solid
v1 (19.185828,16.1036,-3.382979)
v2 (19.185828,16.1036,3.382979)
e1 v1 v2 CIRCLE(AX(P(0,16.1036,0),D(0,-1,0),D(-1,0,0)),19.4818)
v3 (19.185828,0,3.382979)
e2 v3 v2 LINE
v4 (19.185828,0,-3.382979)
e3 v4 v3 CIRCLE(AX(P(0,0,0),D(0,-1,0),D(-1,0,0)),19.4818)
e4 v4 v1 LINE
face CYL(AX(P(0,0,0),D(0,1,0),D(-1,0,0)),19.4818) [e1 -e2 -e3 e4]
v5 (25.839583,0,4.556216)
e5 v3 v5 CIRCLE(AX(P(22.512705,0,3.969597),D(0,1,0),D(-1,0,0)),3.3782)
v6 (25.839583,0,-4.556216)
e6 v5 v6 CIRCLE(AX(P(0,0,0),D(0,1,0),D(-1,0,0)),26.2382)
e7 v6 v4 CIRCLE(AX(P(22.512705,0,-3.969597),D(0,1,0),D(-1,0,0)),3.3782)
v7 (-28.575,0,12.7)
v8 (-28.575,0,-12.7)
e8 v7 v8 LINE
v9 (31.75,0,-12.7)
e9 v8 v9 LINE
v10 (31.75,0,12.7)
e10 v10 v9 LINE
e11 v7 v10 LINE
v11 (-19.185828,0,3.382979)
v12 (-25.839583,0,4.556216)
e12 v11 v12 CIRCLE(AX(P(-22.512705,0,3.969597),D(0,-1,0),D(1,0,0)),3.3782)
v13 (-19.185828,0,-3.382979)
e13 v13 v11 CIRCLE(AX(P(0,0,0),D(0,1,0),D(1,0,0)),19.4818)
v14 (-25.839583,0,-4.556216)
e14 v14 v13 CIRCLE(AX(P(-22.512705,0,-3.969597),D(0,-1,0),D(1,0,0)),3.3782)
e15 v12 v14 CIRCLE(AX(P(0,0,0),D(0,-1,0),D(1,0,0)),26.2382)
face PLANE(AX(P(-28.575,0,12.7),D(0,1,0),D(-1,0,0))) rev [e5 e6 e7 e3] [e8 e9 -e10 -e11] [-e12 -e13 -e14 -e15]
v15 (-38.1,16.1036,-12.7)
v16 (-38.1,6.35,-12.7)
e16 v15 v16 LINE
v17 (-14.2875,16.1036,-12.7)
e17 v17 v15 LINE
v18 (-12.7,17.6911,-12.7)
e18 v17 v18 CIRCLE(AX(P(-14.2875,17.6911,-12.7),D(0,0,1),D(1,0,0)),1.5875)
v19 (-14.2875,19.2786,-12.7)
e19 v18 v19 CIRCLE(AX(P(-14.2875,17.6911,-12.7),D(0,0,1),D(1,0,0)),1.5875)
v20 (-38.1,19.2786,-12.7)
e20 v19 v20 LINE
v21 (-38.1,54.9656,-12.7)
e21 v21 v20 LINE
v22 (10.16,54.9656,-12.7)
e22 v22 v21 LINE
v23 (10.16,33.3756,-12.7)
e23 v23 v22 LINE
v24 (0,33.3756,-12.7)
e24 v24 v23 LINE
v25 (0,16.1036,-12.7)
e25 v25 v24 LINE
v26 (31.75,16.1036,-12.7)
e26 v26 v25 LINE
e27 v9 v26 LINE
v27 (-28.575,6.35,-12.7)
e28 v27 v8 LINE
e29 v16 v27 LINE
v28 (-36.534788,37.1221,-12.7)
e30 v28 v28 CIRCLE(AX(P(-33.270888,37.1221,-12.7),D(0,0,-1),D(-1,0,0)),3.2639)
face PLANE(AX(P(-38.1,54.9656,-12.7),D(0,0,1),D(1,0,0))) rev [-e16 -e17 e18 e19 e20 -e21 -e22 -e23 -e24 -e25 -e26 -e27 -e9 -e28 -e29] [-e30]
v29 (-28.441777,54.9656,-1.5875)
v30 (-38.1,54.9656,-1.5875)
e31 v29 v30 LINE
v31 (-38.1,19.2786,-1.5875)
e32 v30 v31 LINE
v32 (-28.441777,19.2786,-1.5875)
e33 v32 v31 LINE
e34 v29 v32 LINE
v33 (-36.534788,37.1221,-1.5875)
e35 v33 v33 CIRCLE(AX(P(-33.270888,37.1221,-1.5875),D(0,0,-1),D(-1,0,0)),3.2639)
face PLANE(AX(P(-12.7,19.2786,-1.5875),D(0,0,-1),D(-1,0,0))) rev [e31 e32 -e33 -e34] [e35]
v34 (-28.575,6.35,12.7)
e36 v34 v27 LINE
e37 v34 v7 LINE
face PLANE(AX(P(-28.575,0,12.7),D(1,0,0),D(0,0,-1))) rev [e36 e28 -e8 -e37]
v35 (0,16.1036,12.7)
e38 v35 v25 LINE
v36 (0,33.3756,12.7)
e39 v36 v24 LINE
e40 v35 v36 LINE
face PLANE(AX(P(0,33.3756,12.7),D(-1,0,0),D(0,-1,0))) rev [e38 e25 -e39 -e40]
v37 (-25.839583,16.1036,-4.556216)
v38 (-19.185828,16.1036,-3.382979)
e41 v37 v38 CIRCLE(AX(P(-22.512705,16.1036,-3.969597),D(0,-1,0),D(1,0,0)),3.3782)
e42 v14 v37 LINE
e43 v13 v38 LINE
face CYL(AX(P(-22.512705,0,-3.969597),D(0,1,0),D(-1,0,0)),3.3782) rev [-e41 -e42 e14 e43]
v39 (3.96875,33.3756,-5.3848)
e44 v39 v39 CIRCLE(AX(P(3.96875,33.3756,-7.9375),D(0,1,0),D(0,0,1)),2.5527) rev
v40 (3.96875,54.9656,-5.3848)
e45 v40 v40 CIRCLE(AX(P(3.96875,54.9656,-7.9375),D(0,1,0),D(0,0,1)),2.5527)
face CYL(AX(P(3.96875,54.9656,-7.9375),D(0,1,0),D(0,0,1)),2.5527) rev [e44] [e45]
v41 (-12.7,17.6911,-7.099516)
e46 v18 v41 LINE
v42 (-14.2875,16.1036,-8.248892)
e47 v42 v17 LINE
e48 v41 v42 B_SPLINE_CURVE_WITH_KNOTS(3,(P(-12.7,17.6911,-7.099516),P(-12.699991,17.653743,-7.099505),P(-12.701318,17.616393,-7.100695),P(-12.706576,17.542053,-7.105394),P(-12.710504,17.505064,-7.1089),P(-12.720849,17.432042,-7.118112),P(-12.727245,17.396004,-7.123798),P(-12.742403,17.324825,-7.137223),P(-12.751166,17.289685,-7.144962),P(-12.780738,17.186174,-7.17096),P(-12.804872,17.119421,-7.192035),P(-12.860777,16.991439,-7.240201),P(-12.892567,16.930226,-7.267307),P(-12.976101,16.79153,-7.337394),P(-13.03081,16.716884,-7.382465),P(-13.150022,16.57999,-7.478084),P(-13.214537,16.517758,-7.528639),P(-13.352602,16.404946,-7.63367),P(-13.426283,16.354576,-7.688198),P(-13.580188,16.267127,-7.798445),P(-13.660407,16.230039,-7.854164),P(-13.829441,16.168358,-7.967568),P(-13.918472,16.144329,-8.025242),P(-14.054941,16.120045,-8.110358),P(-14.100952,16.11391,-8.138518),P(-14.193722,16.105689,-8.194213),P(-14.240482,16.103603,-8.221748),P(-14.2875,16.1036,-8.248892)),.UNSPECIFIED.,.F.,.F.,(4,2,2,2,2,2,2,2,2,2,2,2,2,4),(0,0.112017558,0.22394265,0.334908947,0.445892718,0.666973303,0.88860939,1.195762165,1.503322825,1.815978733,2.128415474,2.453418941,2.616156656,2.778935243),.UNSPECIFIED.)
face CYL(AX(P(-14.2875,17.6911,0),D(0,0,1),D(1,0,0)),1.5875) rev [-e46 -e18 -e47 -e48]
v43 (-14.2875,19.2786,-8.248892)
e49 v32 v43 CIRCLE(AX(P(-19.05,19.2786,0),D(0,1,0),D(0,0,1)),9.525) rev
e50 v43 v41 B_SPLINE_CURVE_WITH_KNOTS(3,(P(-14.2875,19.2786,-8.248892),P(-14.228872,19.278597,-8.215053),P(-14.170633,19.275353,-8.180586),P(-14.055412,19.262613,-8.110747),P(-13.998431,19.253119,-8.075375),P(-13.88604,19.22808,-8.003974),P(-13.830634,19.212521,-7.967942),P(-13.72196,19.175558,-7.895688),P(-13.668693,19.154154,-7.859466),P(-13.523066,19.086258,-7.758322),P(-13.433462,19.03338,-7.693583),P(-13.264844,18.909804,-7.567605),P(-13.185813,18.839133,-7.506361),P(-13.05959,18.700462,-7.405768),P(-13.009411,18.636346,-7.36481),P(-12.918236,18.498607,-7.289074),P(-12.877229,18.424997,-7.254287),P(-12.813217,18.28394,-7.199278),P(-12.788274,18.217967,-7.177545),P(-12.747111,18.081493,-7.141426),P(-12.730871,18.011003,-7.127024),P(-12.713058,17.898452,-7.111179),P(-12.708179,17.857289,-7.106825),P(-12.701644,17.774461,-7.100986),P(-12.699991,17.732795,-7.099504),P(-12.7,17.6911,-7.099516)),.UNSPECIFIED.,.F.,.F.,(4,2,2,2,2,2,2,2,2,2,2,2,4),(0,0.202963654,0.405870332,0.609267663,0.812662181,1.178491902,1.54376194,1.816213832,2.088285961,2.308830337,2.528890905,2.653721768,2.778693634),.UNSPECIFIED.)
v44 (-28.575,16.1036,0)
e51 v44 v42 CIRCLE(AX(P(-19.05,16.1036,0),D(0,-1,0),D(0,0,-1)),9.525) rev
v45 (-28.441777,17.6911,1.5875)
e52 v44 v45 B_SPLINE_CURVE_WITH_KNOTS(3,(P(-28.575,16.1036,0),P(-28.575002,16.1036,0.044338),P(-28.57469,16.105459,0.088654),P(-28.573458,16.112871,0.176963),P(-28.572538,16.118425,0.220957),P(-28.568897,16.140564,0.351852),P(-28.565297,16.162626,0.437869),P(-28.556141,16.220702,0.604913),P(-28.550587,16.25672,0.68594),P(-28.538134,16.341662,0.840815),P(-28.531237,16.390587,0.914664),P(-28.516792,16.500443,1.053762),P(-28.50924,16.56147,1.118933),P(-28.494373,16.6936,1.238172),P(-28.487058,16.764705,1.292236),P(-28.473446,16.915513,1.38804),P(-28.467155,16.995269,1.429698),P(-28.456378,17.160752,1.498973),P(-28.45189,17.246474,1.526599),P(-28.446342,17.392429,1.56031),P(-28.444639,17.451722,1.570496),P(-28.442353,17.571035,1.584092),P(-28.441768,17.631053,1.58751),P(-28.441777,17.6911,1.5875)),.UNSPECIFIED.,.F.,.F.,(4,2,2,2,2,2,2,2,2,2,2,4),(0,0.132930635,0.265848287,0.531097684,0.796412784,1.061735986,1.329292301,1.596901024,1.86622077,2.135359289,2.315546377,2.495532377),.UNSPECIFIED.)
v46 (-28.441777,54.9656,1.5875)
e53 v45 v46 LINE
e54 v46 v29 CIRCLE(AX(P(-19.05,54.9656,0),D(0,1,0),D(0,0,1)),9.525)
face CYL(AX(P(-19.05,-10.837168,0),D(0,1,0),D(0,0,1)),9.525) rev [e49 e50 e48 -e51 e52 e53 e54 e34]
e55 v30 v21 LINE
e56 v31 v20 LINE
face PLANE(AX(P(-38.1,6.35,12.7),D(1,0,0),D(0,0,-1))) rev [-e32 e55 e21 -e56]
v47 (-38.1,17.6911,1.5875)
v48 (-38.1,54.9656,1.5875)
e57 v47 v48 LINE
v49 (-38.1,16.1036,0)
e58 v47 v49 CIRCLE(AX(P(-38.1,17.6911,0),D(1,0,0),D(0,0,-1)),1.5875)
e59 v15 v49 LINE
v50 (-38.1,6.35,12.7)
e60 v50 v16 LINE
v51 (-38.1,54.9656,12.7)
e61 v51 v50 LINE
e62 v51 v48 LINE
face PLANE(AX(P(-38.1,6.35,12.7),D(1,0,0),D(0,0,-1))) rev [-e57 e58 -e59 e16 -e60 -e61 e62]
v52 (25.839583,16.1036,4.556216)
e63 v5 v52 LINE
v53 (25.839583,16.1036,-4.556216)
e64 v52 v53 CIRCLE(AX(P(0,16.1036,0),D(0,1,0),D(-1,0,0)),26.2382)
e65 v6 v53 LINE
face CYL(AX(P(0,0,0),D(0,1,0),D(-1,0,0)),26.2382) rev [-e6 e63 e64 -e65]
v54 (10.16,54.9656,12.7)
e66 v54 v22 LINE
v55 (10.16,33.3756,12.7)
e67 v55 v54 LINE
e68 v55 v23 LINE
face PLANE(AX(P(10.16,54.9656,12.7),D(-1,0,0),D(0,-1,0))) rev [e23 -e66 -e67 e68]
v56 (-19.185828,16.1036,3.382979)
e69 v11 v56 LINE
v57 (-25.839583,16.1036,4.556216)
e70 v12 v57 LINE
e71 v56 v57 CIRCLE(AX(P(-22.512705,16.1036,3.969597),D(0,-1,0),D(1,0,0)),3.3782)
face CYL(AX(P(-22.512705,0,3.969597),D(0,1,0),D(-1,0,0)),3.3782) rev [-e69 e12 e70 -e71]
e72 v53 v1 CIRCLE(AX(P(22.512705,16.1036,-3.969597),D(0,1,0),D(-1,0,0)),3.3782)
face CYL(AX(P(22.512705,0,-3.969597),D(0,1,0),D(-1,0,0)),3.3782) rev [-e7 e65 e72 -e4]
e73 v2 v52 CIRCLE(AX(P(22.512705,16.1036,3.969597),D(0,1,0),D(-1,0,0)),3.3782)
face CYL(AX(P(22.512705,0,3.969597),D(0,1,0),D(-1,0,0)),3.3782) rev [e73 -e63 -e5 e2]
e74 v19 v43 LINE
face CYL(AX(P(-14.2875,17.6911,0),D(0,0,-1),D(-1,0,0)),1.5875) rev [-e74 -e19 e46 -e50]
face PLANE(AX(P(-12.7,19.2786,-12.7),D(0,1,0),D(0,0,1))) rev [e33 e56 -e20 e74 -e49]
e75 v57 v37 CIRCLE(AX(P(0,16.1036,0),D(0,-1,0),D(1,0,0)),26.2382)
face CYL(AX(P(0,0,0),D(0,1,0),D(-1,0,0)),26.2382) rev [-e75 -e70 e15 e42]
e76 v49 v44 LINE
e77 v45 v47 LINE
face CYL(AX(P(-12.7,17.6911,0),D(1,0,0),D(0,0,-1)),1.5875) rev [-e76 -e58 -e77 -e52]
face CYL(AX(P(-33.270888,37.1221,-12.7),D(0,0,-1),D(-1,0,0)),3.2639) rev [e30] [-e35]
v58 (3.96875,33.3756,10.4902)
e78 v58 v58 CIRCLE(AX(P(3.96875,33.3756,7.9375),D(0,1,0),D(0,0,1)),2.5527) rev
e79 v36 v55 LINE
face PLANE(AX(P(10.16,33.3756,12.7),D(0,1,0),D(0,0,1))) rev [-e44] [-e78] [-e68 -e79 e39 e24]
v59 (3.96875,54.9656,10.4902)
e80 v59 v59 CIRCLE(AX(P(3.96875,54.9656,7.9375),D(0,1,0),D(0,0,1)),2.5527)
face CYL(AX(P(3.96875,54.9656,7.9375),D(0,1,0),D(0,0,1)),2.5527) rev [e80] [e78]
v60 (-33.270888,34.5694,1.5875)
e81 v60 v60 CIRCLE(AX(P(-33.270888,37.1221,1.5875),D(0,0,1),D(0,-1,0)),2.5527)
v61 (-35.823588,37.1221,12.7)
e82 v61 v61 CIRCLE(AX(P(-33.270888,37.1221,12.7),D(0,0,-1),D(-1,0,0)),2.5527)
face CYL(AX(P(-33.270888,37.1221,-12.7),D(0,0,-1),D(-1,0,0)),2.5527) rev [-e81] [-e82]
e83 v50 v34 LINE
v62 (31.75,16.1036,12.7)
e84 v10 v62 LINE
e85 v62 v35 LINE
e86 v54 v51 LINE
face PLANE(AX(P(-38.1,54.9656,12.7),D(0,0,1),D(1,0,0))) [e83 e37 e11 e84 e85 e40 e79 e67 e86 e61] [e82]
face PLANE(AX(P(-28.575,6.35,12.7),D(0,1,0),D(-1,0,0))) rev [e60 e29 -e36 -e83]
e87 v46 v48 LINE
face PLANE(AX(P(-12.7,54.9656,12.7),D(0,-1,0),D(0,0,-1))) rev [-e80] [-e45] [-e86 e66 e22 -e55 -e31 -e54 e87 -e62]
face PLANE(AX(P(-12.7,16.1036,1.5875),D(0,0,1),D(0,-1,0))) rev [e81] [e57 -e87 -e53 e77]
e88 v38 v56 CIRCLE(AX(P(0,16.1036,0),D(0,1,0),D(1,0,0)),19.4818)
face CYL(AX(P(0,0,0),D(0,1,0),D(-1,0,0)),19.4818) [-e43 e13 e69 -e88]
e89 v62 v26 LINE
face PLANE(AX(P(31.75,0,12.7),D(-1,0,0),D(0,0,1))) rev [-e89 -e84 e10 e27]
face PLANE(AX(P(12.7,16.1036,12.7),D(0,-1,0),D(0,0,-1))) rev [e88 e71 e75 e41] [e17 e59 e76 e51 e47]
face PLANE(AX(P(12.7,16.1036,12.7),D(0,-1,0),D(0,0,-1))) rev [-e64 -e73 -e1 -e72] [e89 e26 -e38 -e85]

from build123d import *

# Parameters (mm, degrees)
EXTRUDE1_DEPTH              = 12.7
ARC_MOUNTING_SLOT_I_DEPTH   = 56.885195213
CLAMPING_SCREW_HOLES_D      = 5.1054
CLAMPING_SCREW_HOLES_DEPTH  = 21.59
CLAMPING_SCREW_HOLES_TIP    = 1.533816902
SKETCH7_R                   = 9.525
CUT_EXTRUDE1_DEPTH          = 38.862
CUT_EXTRUDE2_DEPTH          = 25.4
ADVANCEDHOLE1_START         = -12.7
ADVANCEDHOLE1_OUTLINE_R     = 2.5527
ADVANCEDHOLE1_DEPTH         = 25.4
ADVANCEDHOLE1_2_OUTLINE_R   = 3.2639
ADVANCEDHOLE1_2_OUTLINE_R_2 = 2.5527
ADVANCEDHOLE1_2_DEPTH       = 11.1125
FILLET1_R                   = 1.5875


# Read off the part's stored shape, not the designer's step: AdvancedHole1
with BuildPart() as part:
    # Sketch1 → Extrude1 (new, symmetric)
    with BuildSketch(Plane.XY):
        Polygon((-28.575, 0), (-28.575, 6.35), (-38.1, 6.35), (-38.1, 16.1036), (-38.1, 54.9656), (-12.7, 54.9656), (10.16, 54.9656), (10.16, 33.3756), (0, 33.3756), (0, 16.1036), (12.7, 16.1036), (31.75, 16.1036), (31.75, 0), align=None)
    extrude(amount=EXTRUDE1_DEPTH, both=True)

    # Sketch2 → Arc mounting slot I (cut, through all)
    with BuildSketch(Plane(origin=(0, 16.1036, 0), x_dir=(-1, 0, 0), z_dir=(0, 1, 0))):
        with BuildLine():
            ThreePointArc((-25.839582785, -4.556215615), (-21.92608696, -7.296474893), (-19.185827683, -3.382979068))
            ThreePointArc((-19.185827683, -3.382979068), (-19.4818, 0), (-19.185827683, 3.382979068))
            ThreePointArc((-19.185827683, 3.382979068), (-21.92608696, 7.296474893), (-25.839582785, 4.556215615))
            ThreePointArc((-25.839582785, 4.556215615), (-26.2382, 0), (-25.839582785, -4.556215615))
        make_face()
    arc_mounting_slot_i = extrude(amount=-ARC_MOUNTING_SLOT_I_DEPTH, mode=Mode.SUBTRACT)

    # Arc mounting slot II: Arc mounting slot I across plane
    add(arc_mounting_slot_i.mirror(Plane(origin=(0, 0, 0), x_dir=(0, 0, 1), z_dir=(1, 0, 0))), mode=Mode.SUBTRACT)

    # Clamping screw holes
    with Locations(Plane(origin=(0, 54.9656, 0), x_dir=(-1, 0, 0), z_dir=(0, 1, 0))):
        with Locations((-3.96875, -7.9375), (-3.96875, 7.9375)):
            Hole(CLAMPING_SCREW_HOLES_D / 2, depth=CLAMPING_SCREW_HOLES_DEPTH)
            with Locations((0, 0, -(CLAMPING_SCREW_HOLES_DEPTH + CLAMPING_SCREW_HOLES_TIP / 2))):  # 118° drill point
                Cone(0, CLAMPING_SCREW_HOLES_D / 2, CLAMPING_SCREW_HOLES_TIP, mode=Mode.SUBTRACT)

    # Sketch7 → Cut-Extrude1 (cut)
    with BuildSketch(Plane(origin=(0, 54.9656, 0), x_dir=(1, 0, 0), z_dir=(0, 1, 0))):
        with Locations(Location((-19.05, 0, 0), (0, 0, 270))):
            Circle(SKETCH7_R)
    extrude(amount=-CUT_EXTRUDE1_DEPTH, mode=Mode.SUBTRACT)

    # Sketch9 → Cut-Extrude2 (cut)
    with BuildSketch(Plane.ZY.offset(38.1)):
        Polygon((-1.5875, 19.2786), (-1.5875, 54.9656), (1.5875, 54.9656), (1.5875, 16.1036), (-12.7, 16.1036), (-12.7, 19.2786), align=None)
    extrude(amount=-CUT_EXTRUDE2_DEPTH, mode=Mode.SUBTRACT)

    # AdvancedHole1 outline → AdvancedHole1 (cut)
    with BuildSketch(Plane.XY.offset(ADVANCEDHOLE1_START)):
        with Locations((-33.270888328, 37.1221)):
            Circle(ADVANCEDHOLE1_OUTLINE_R)
    extrude(amount=ADVANCEDHOLE1_DEPTH, mode=Mode.SUBTRACT)

    # AdvancedHole1 2 outline → AdvancedHole1 2 (cut)
    with BuildSketch(Plane.XY.offset(ADVANCEDHOLE1_START)):
        with Locations((-33.270888328, 37.1221)):
            Circle(ADVANCEDHOLE1_2_OUTLINE_R)
        with Locations((-33.270888328, 37.1221)):
            Circle(ADVANCEDHOLE1_2_OUTLINE_R_2, mode=Mode.SUBTRACT)
    extrude(amount=ADVANCEDHOLE1_2_DEPTH, mode=Mode.SUBTRACT)

    # Fillet1
    fillet1_edges = [part.edges().sort_by_distance(p)[0] for p in [
        (-12.7, 19.2786, -9.899757914),
        (-12.7, 16.1036, -9.899757914),
        (-33.270888328, 16.1036, 1.5875),
    ]]
    fillet(fillet1_edges, radius=FILLET1_R - 0.0001)  # a hair under: the kernel refuses the full size


solid = part.part
